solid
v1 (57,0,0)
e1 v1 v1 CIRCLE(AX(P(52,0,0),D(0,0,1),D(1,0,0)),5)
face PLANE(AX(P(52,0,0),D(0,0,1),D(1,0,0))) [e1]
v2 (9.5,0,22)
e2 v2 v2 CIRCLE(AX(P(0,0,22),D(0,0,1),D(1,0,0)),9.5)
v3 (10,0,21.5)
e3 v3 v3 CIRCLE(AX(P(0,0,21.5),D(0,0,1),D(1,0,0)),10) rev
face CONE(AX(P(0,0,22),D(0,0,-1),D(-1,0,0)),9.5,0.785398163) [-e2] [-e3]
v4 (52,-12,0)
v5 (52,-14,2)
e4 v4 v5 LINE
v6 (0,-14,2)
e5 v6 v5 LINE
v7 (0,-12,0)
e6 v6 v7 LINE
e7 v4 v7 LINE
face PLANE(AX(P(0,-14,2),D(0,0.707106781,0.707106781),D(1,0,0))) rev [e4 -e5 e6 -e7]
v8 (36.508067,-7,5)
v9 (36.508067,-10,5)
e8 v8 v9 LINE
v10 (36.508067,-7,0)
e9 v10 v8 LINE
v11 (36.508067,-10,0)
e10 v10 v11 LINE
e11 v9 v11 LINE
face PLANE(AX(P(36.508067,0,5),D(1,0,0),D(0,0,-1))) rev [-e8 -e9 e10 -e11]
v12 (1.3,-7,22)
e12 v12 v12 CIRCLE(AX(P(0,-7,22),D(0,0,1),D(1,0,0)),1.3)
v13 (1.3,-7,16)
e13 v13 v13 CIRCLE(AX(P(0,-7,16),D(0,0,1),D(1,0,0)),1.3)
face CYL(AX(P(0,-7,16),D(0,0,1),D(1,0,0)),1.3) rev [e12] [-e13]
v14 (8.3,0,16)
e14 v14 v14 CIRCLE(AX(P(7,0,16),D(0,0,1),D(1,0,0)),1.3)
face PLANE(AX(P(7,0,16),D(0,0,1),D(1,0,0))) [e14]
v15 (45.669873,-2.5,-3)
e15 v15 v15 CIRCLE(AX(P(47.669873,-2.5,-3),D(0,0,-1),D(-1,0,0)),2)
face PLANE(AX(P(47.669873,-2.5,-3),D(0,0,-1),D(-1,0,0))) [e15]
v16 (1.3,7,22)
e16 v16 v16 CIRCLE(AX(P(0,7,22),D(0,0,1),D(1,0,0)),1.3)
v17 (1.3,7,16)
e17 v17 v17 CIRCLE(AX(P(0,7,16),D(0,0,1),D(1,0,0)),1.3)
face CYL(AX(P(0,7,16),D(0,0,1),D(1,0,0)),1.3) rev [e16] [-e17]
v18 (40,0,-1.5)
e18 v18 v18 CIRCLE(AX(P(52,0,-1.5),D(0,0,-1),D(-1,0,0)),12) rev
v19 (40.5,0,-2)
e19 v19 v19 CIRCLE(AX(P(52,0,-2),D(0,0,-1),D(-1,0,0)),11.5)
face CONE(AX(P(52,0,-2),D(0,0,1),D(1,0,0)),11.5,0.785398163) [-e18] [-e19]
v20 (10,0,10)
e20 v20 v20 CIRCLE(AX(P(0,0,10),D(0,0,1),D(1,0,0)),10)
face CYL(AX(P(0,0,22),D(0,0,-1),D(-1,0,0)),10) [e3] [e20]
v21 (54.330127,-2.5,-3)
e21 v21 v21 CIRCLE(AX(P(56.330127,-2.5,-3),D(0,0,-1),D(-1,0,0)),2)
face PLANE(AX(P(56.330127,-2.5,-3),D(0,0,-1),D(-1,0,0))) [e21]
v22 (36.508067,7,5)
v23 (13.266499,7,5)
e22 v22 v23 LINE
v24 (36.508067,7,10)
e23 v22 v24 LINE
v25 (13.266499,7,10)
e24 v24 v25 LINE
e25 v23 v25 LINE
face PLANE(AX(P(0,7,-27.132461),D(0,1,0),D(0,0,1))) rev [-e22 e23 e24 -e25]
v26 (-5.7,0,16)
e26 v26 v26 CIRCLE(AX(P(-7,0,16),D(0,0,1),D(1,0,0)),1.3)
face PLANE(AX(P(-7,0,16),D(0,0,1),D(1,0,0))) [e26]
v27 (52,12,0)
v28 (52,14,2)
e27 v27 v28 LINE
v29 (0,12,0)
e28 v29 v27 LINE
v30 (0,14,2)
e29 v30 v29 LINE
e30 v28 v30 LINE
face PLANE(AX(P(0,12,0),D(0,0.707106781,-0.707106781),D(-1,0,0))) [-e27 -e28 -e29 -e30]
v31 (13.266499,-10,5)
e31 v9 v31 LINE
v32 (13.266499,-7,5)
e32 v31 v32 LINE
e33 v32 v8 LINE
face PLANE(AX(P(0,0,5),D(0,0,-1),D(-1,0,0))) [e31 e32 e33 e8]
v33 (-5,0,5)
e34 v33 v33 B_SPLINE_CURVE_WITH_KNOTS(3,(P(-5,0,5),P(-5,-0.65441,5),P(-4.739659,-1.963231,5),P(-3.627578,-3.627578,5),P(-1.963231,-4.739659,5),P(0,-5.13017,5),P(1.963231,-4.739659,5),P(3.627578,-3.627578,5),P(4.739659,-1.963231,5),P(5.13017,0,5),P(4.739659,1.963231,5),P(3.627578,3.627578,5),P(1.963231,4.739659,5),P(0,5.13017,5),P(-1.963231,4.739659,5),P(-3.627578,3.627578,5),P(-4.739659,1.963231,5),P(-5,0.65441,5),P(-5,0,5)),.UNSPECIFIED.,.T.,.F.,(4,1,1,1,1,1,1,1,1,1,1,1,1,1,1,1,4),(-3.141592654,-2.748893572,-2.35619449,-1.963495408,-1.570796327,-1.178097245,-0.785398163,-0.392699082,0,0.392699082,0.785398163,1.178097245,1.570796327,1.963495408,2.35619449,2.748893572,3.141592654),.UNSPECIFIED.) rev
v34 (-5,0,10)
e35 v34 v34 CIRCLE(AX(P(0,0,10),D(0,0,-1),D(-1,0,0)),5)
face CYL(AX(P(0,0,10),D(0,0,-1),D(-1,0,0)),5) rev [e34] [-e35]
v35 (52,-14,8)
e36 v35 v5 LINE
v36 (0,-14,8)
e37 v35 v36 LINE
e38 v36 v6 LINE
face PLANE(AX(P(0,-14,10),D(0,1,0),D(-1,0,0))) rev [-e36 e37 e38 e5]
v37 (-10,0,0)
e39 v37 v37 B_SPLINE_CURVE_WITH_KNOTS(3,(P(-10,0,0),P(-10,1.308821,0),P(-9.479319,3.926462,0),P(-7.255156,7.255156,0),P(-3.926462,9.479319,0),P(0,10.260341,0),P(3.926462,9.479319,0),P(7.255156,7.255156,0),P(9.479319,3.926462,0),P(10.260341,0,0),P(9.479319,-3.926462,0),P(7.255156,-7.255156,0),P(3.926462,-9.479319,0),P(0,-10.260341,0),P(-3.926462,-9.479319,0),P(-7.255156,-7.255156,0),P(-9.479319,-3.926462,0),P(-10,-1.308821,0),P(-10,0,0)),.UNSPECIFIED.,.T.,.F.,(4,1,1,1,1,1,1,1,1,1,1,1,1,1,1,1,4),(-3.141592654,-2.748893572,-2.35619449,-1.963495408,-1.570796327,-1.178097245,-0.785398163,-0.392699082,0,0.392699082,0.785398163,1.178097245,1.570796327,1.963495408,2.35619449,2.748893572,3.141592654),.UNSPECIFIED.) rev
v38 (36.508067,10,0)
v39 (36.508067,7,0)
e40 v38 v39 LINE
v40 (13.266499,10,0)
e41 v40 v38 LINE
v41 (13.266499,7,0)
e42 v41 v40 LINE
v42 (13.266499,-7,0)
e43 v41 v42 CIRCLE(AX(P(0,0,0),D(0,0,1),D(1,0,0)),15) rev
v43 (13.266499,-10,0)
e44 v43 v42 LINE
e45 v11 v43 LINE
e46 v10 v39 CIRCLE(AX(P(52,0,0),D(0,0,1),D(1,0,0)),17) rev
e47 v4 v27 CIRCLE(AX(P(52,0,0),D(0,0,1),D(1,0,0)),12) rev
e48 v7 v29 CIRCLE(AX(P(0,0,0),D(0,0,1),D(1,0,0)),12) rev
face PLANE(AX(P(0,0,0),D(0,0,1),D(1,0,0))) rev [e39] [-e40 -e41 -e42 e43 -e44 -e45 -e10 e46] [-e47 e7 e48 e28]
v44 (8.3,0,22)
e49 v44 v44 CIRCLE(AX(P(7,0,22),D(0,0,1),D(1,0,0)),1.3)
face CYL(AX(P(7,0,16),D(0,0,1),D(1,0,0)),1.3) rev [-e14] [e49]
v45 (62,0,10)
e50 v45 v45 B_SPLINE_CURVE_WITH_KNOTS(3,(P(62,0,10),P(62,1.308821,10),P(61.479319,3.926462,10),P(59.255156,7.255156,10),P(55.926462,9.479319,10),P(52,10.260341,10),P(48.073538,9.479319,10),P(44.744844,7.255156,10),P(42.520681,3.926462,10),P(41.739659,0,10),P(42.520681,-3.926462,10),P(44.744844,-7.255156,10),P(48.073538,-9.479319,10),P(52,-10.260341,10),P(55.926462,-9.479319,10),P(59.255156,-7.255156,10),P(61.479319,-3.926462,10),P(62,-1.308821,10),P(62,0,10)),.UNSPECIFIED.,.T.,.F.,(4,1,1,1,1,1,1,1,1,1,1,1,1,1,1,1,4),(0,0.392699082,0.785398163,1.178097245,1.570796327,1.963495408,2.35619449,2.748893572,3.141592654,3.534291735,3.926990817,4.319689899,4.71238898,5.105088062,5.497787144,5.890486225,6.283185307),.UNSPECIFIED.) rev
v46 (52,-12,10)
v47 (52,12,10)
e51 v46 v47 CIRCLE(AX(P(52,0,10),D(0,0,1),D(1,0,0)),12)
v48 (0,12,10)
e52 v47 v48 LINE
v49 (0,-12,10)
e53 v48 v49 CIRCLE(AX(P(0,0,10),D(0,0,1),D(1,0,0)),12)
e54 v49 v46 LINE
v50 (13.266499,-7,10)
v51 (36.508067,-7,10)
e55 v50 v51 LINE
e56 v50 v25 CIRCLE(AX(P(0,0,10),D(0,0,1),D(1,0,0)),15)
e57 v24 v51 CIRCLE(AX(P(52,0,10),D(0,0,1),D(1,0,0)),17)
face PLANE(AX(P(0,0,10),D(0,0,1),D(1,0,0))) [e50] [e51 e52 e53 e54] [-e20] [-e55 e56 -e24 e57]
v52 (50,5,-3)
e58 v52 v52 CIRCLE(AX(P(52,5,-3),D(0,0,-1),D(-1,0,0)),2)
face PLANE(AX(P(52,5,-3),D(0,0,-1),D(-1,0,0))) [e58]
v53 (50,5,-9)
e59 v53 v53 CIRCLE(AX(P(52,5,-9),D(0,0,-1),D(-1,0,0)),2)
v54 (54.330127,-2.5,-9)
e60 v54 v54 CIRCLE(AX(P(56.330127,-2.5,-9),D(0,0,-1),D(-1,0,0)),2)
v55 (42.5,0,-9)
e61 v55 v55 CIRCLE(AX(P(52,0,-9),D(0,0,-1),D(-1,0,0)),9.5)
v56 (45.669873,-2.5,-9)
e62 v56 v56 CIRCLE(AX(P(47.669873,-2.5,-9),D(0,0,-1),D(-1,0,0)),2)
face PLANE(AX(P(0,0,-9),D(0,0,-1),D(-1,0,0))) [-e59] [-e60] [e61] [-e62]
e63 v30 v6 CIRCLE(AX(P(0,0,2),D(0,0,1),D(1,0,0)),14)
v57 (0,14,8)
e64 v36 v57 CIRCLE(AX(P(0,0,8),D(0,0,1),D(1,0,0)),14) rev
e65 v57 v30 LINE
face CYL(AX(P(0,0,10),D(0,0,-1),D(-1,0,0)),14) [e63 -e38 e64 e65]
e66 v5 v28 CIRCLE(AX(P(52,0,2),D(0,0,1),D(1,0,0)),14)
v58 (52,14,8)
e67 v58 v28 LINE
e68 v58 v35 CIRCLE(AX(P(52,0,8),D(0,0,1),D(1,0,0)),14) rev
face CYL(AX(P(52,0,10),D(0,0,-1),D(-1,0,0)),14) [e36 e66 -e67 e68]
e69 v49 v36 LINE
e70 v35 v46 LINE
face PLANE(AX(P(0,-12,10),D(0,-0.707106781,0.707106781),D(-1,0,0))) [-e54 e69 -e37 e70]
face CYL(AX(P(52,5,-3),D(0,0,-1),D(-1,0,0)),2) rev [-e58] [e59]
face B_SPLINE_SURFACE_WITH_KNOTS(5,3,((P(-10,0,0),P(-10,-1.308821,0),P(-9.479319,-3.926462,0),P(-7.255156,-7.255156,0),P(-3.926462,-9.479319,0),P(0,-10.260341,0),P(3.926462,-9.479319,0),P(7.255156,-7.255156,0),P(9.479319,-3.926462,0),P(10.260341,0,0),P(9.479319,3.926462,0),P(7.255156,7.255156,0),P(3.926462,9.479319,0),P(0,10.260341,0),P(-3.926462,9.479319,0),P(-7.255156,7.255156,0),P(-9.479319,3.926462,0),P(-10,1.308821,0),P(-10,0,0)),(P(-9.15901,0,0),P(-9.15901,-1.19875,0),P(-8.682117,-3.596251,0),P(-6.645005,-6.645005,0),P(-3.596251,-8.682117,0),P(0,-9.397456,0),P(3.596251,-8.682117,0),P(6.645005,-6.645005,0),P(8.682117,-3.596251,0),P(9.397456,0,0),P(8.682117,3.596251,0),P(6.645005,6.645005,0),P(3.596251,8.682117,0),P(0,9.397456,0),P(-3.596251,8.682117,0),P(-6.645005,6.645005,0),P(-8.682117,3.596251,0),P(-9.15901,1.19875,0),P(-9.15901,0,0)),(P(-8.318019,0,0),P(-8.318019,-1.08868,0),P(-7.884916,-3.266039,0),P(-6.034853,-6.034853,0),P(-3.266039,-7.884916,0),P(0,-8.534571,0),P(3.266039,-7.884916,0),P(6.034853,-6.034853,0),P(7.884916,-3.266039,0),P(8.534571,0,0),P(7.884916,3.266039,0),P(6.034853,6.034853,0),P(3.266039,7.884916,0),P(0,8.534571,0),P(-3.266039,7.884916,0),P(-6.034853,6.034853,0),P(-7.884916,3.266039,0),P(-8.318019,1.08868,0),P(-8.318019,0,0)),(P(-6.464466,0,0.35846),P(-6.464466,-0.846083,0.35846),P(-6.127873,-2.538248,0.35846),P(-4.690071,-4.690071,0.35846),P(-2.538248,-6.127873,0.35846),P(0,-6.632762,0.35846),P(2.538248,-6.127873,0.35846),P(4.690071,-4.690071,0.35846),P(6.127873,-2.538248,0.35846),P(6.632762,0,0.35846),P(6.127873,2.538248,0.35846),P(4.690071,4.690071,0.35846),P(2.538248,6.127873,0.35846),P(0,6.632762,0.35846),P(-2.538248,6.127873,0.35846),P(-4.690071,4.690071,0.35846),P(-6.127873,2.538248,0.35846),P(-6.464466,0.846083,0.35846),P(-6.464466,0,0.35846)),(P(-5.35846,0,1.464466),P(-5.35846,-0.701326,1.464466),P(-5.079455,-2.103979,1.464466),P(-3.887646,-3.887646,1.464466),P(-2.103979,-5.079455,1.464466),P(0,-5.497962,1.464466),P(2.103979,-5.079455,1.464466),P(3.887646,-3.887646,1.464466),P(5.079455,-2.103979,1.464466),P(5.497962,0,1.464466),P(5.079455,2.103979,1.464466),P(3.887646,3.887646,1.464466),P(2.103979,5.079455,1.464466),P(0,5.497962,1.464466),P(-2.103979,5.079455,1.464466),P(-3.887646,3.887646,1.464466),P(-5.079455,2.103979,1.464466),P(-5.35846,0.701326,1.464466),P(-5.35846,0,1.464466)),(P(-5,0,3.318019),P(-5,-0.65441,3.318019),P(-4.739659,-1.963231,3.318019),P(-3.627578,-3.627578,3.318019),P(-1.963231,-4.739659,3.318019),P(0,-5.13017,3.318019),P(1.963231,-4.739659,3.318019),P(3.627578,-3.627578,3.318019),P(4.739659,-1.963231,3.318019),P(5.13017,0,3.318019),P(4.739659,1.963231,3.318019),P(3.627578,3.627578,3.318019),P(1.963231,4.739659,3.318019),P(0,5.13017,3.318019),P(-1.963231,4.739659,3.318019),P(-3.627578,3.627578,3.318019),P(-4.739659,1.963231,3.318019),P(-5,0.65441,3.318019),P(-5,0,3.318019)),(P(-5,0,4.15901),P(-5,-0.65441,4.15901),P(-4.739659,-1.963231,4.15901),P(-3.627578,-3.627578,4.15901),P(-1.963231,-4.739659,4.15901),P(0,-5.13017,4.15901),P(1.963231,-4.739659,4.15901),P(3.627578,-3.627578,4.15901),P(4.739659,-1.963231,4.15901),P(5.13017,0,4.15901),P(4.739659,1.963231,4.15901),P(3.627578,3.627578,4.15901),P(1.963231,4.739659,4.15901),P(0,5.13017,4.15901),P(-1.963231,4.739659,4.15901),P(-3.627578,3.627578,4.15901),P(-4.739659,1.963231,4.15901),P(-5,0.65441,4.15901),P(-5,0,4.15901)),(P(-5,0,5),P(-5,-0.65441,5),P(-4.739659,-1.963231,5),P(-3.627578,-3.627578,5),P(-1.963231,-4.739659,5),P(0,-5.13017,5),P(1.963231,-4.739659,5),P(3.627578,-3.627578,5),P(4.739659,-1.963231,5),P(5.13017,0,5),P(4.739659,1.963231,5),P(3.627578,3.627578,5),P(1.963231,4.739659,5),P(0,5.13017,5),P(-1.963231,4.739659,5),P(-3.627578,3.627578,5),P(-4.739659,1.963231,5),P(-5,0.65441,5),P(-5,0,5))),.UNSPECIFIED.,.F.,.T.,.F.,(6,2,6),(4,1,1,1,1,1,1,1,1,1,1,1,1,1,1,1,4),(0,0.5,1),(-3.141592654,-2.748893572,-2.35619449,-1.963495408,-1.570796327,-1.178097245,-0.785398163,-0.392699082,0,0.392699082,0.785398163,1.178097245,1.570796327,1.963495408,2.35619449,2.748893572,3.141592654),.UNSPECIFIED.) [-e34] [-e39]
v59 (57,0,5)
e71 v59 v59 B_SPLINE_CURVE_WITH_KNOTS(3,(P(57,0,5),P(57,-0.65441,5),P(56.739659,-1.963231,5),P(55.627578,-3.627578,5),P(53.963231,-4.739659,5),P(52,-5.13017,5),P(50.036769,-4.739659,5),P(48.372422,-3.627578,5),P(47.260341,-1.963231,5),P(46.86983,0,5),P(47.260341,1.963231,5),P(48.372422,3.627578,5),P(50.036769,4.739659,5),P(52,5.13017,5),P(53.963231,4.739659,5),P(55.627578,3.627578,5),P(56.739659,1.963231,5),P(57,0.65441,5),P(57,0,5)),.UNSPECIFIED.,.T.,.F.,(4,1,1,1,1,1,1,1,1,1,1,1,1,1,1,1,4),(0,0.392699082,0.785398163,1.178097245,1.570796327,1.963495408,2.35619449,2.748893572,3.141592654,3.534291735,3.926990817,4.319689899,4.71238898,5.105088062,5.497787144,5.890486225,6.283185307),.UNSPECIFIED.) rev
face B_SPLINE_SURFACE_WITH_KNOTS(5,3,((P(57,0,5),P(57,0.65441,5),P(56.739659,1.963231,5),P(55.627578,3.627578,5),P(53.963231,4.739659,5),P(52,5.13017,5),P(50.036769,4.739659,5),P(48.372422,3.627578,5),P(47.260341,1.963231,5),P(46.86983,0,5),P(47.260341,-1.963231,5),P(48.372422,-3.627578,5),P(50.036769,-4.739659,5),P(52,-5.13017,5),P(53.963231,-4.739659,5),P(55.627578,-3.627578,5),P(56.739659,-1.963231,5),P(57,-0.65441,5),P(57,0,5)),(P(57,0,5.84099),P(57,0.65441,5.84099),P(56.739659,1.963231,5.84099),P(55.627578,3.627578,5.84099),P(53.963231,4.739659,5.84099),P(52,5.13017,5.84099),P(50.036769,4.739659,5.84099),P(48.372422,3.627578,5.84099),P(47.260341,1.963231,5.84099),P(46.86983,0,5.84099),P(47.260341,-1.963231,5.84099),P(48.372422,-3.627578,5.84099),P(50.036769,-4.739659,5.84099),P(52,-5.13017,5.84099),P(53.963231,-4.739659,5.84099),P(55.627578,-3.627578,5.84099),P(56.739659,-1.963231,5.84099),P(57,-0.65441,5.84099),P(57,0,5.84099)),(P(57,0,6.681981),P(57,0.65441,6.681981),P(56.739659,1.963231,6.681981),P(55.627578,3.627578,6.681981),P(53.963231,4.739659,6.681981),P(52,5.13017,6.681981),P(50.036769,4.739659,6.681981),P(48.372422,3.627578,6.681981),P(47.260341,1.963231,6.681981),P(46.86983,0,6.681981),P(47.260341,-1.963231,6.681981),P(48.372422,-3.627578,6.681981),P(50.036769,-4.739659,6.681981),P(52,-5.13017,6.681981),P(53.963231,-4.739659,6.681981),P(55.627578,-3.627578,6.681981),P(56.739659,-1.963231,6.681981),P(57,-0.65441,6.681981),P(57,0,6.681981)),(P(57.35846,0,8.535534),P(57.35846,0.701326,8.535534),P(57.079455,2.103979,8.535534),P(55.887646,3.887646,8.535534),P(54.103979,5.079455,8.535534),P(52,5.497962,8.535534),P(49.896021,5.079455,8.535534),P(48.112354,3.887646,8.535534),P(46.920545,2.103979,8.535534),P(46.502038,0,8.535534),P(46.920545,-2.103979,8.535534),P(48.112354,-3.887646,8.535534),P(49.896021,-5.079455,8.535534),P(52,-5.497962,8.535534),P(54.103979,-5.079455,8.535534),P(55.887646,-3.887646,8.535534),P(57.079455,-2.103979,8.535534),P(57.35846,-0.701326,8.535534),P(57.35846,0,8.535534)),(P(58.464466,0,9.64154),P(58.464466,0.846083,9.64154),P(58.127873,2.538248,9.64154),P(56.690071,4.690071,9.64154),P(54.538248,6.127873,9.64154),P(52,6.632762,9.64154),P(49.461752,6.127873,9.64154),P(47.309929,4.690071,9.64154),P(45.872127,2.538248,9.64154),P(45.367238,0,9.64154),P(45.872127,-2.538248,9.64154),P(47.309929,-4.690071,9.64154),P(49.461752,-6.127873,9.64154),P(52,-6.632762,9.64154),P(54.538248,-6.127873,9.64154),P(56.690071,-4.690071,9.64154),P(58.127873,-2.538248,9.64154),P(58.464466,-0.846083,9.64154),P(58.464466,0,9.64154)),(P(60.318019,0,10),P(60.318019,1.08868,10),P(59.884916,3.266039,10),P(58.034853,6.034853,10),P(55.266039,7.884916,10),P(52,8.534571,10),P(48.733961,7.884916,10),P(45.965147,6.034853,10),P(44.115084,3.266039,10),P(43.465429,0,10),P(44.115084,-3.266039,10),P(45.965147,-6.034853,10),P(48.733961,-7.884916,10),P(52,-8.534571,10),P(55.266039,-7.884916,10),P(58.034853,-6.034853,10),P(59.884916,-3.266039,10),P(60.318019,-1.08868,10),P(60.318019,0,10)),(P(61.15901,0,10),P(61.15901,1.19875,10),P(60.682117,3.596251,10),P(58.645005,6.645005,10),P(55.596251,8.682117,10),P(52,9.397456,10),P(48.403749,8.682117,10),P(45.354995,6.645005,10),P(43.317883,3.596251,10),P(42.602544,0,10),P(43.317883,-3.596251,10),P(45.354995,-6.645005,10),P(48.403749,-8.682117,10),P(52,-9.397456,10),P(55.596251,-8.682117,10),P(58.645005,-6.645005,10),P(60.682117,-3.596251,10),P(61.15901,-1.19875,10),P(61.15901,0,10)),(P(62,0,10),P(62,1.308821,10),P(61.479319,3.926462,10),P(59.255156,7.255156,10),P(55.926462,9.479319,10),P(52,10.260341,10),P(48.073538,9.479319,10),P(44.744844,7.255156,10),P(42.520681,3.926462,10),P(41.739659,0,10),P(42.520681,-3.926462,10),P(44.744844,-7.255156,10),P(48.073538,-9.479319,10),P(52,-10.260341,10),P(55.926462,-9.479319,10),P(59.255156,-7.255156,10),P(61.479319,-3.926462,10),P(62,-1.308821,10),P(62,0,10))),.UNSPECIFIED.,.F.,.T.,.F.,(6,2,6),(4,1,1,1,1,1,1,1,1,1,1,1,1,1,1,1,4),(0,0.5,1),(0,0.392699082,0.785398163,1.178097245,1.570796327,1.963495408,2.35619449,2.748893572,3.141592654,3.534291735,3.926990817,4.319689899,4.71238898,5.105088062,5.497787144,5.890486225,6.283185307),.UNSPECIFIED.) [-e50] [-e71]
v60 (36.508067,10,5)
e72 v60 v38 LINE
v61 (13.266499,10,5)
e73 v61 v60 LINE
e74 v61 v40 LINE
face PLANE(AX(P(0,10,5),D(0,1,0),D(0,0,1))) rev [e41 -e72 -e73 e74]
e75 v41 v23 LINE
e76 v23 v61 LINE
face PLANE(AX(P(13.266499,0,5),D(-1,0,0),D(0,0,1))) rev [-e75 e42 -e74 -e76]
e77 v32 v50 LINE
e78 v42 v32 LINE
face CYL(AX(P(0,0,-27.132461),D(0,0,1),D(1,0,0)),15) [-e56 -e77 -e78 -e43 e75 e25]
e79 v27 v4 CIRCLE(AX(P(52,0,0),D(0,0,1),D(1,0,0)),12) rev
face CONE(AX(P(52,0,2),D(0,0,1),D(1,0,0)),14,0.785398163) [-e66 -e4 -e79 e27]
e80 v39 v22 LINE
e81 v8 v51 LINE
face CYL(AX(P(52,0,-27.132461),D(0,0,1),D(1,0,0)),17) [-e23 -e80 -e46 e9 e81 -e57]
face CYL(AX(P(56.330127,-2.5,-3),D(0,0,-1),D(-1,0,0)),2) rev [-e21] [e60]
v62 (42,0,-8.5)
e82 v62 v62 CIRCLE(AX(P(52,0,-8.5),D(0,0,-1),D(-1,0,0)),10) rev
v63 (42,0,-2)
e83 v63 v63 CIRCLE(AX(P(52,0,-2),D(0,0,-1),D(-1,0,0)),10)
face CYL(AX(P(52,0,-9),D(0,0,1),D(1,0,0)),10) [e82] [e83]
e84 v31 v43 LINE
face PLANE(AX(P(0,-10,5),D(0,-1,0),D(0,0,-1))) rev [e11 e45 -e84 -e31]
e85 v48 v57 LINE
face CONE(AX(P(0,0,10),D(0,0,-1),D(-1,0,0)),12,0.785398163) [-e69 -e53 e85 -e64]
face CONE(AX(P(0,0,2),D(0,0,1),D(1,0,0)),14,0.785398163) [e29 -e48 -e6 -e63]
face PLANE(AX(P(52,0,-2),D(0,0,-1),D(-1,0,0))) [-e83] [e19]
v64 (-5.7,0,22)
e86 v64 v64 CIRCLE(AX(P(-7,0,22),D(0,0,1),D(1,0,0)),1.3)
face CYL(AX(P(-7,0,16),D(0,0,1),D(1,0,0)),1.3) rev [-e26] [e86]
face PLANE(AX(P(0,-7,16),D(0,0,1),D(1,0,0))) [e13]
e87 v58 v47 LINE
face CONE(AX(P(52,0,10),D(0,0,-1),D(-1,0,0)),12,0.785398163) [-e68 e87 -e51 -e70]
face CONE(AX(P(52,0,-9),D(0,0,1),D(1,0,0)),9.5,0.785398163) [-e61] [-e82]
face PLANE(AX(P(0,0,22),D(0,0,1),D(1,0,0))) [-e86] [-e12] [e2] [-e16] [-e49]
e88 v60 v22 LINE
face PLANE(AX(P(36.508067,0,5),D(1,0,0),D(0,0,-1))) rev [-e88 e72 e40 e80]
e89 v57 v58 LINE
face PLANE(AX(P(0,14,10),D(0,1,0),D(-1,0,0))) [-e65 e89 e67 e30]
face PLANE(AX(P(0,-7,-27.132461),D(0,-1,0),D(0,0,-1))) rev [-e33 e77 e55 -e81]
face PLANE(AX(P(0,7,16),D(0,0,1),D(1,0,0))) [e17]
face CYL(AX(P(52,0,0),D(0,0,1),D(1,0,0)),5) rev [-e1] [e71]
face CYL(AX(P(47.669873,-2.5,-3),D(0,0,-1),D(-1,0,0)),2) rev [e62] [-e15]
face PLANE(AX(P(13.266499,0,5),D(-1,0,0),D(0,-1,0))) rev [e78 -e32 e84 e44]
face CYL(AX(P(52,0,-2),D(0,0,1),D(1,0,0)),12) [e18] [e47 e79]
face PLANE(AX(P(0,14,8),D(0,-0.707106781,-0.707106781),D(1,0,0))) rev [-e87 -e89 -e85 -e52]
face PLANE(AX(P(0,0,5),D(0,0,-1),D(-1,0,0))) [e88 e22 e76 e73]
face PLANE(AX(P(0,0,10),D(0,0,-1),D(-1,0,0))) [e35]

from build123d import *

# Parameters (mm, degrees)
EXTRUDE_1_DEPTH     = 10
SKETCH_2_R          = 10
EXTRUDE_2_DEPTH     = 12
SKETCH_3_R          = 10
EXTRUDE_3_DEPTH     = 9
SKETCH_4_R          = 12
SKETCH_4_R_2        = 10
EXTRUDE_4_DEPTH     = 2
CHAMFER_1_SIZE      = 0.5
CHAMFER_2_SIZE      = 2
SKETCH_5_R          = 2
CUT_EXTRUDE_1_DEPTH = 6
SKETCH_6_R          = 1.3
CUT_EXTRUDE_2_DEPTH = 6
CUT_EXTRUDE_3_DEPTH = 10
SKETCH_8_W          = 23.241567454
SKETCH_8_H          = 3
CUT_EXTRUDE_4_DEPTH = 5
SKETCH_9_R          = 5
CUT_EXTRUDE_5_DEPTH = 10
SKETCH_10_R         = 5
CUT_EXTRUDE_6_DEPTH = 10
FILLET_1_SIZE       = 5


# Some blends are built 0.0001 mm under size
with BuildPart() as part:
    # 草图1 → 凸台-拉伸1 (new body)
    with BuildSketch(Plane.XY):
        with BuildLine():
            Line((52, 14), (0, 14))
            ThreePointArc((0, 14), (-14, 0), (0, -14))
            Line((0, -14), (52, -14))
            ThreePointArc((52, -14), (66, 0), (52, 14))
        make_face()
    extrude(amount=EXTRUDE_1_DEPTH)

    # 草图2 → 凸台-拉伸2 (add)
    with BuildSketch(Plane.XY.offset(10)):
        Circle(SKETCH_2_R)
    extrude(amount=EXTRUDE_2_DEPTH)

    # 草图3 → 凸台-拉伸3 (add)
    with BuildSketch(Plane(origin=(0, 0, 0), x_dir=(-1, 0, 0), z_dir=(0, 0, -1))):
        with Locations((-52, 0)):
            Circle(SKETCH_3_R)
    extrude(amount=EXTRUDE_3_DEPTH)

    # 草图4 → 凸台-拉伸4 (add)
    with BuildSketch(Plane(origin=(0, 0, 0), x_dir=(-1, 0, 0), z_dir=(0, 0, -1))):
        with Locations(Location((-52, 0, 0), (0, 0, 180))):
            Circle(SKETCH_4_R)
        with Locations((-52, 0)):
            Circle(SKETCH_4_R_2, mode=Mode.SUBTRACT)
    extrude(amount=EXTRUDE_4_DEPTH)

    # 倒角1
    chamfer_1_edges = [part.edges().sort_by_distance(p)[0] for p in [
        (-10, 0, 22),
        (62, 0, -9),
        (40, 0, -2),
    ]]
    chamfer(chamfer_1_edges, length=CHAMFER_1_SIZE)

    # 倒角2
    chamfer_2_edges = [part.edges().sort_by_distance(p)[0] for p in [
        (66, 0, 10),
        (26, 14, 10),
        (-14, 0, 10),
        (26, -14, 10),
        (-14, 0, 0),
        (26, 14, 0),
        (66, 0, 0),
        (26, -14, 0),
    ]]
    chamfer(chamfer_2_edges, length=CHAMFER_2_SIZE - 0.0001)  # a hair under: the kernel refuses the full size

    # 草图5 → 切除-拉伸1 (cut)
    with BuildSketch(Plane(origin=(0, 0, -9), x_dir=(-1, 0, 0), z_dir=(0, 0, -1))):
        with Locations((-52, 5)):
            Circle(SKETCH_5_R)
        with Locations((-47.669872981, -2.5)):
            Circle(SKETCH_5_R)
        with Locations((-56.330127019, -2.5)):
            Circle(SKETCH_5_R)
    extrude(amount=-CUT_EXTRUDE_1_DEPTH, mode=Mode.SUBTRACT)

    # 草图6 → 切除-拉伸2 (cut)
    with BuildSketch(Plane.XY.offset(22)):
        with Locations((0, 7)):
            Circle(SKETCH_6_R)
        with Locations((7, 0)):
            Circle(SKETCH_6_R)
        with Locations((0, -7)):
            Circle(SKETCH_6_R)
        with Locations((-7, 0)):
            Circle(SKETCH_6_R)
    extrude(amount=-CUT_EXTRUDE_2_DEPTH, mode=Mode.SUBTRACT)

    # 草图7 → 切除-拉伸3 (cut)
    with BuildSketch(Plane.XY.offset(10)):
        with BuildLine():
            ThreePointArc((36.508066615, -7), (35, 0), (36.508066615, 7))
            Line((36.508066615, 7), (13.266499161, 7))
            ThreePointArc((13.266499161, 7), (14.560176637, 3.605725487), (15, 0))
            ThreePointArc((15, 0), (14.560176637, -3.605725487), (13.266499161, -7))
            Line((13.266499161, -7), (36.508066615, -7))
        make_face()
    extrude(amount=-CUT_EXTRUDE_3_DEPTH, mode=Mode.SUBTRACT)

    # 草图8 → 切除-拉伸4 (cut)
    with BuildSketch(Plane(origin=(0, 0, 0), x_dir=(-1, 0, 0), z_dir=(0, 0, -1))):
        with Locations((-24.887282888, 8.5)):
            Rectangle(SKETCH_8_W, SKETCH_8_H)
        with Locations((-24.887282888, -8.5)):
            Rectangle(SKETCH_8_W, SKETCH_8_H)
    extrude(amount=-CUT_EXTRUDE_4_DEPTH, mode=Mode.SUBTRACT)

    # 草图9 → 切除-拉伸5 (cut)
    with BuildSketch(Plane.XY.offset(10)):
        with Locations((52, 0)):
            Circle(SKETCH_9_R)
    extrude(amount=-CUT_EXTRUDE_5_DEPTH, mode=Mode.SUBTRACT)

    # 草图10 → 切除-拉伸6 (cut)
    with BuildSketch(Plane(origin=(0, 0, 0), x_dir=(-1, 0, 0), z_dir=(0, 0, -1))):
        Circle(SKETCH_10_R)
    extrude(amount=-CUT_EXTRUDE_6_DEPTH, mode=Mode.SUBTRACT)

    # 圆角1
    # a fillet whose section is not a circle: 5 mm, written as the material it takes off along each edge
    with BuildSketch(Plane(origin=(52, 0, 10), x_dir=(1, 0, 0), z_dir=(0, -1, 0))) as fillet_1_piece_1:
        with BuildLine():
            add(Edge.make_bspline([(5 + FILLET_1_SIZE, 0), (5 + FILLET_1_SIZE * 0.831801948466, 0), (5 + FILLET_1_SIZE * 0.663603896932, 0), (5 + FILLET_1_SIZE * 0.292893218813, -FILLET_1_SIZE * 0.0716919198361), (5 + FILLET_1_SIZE * 0.0716919198361, -FILLET_1_SIZE * 0.292893218813), (5, -FILLET_1_SIZE * 0.663603896932), (5, -FILLET_1_SIZE * 0.831801948466), (5, -FILLET_1_SIZE)], knots=[0, 0, 0, 0, 0, 0, 0.5, 0.5, 1, 1, 1, 1, 1, 1], degree=5))
            Line((5, -FILLET_1_SIZE), (5, 0))
            Line((5, 0), (5 + FILLET_1_SIZE, 0))
        make_face()
    revolve(axis=Axis((52, 0, 10), (0, 0, 1)), mode=Mode.SUBTRACT)
    with BuildSketch(Plane(origin=(0, 0, 0), x_dir=(-1, 0, 0), z_dir=(0, -1, 0))) as fillet_1_piece_2:
        with BuildLine():
            add(Edge.make_bspline([(5 + FILLET_1_SIZE, 0), (5 + FILLET_1_SIZE * 0.831801948466, 0), (5 + FILLET_1_SIZE * 0.663603896932, 0), (5 + FILLET_1_SIZE * 0.292893218813, -FILLET_1_SIZE * 0.0716919198361), (5 + FILLET_1_SIZE * 0.0716919198361, -FILLET_1_SIZE * 0.292893218813), (5, -FILLET_1_SIZE * 0.663603896932), (5, -FILLET_1_SIZE * 0.831801948466), (5, -FILLET_1_SIZE)], knots=[0, 0, 0, 0, 0, 0, 0.5, 0.5, 1, 1, 1, 1, 1, 1], degree=5))
            Line((5, -FILLET_1_SIZE), (5, 0))
            Line((5, 0), (5 + FILLET_1_SIZE, 0))
        make_face()
    revolve(axis=Axis((0, 0, 0), (0, 0, -1)), mode=Mode.SUBTRACT)


solid = part.part
